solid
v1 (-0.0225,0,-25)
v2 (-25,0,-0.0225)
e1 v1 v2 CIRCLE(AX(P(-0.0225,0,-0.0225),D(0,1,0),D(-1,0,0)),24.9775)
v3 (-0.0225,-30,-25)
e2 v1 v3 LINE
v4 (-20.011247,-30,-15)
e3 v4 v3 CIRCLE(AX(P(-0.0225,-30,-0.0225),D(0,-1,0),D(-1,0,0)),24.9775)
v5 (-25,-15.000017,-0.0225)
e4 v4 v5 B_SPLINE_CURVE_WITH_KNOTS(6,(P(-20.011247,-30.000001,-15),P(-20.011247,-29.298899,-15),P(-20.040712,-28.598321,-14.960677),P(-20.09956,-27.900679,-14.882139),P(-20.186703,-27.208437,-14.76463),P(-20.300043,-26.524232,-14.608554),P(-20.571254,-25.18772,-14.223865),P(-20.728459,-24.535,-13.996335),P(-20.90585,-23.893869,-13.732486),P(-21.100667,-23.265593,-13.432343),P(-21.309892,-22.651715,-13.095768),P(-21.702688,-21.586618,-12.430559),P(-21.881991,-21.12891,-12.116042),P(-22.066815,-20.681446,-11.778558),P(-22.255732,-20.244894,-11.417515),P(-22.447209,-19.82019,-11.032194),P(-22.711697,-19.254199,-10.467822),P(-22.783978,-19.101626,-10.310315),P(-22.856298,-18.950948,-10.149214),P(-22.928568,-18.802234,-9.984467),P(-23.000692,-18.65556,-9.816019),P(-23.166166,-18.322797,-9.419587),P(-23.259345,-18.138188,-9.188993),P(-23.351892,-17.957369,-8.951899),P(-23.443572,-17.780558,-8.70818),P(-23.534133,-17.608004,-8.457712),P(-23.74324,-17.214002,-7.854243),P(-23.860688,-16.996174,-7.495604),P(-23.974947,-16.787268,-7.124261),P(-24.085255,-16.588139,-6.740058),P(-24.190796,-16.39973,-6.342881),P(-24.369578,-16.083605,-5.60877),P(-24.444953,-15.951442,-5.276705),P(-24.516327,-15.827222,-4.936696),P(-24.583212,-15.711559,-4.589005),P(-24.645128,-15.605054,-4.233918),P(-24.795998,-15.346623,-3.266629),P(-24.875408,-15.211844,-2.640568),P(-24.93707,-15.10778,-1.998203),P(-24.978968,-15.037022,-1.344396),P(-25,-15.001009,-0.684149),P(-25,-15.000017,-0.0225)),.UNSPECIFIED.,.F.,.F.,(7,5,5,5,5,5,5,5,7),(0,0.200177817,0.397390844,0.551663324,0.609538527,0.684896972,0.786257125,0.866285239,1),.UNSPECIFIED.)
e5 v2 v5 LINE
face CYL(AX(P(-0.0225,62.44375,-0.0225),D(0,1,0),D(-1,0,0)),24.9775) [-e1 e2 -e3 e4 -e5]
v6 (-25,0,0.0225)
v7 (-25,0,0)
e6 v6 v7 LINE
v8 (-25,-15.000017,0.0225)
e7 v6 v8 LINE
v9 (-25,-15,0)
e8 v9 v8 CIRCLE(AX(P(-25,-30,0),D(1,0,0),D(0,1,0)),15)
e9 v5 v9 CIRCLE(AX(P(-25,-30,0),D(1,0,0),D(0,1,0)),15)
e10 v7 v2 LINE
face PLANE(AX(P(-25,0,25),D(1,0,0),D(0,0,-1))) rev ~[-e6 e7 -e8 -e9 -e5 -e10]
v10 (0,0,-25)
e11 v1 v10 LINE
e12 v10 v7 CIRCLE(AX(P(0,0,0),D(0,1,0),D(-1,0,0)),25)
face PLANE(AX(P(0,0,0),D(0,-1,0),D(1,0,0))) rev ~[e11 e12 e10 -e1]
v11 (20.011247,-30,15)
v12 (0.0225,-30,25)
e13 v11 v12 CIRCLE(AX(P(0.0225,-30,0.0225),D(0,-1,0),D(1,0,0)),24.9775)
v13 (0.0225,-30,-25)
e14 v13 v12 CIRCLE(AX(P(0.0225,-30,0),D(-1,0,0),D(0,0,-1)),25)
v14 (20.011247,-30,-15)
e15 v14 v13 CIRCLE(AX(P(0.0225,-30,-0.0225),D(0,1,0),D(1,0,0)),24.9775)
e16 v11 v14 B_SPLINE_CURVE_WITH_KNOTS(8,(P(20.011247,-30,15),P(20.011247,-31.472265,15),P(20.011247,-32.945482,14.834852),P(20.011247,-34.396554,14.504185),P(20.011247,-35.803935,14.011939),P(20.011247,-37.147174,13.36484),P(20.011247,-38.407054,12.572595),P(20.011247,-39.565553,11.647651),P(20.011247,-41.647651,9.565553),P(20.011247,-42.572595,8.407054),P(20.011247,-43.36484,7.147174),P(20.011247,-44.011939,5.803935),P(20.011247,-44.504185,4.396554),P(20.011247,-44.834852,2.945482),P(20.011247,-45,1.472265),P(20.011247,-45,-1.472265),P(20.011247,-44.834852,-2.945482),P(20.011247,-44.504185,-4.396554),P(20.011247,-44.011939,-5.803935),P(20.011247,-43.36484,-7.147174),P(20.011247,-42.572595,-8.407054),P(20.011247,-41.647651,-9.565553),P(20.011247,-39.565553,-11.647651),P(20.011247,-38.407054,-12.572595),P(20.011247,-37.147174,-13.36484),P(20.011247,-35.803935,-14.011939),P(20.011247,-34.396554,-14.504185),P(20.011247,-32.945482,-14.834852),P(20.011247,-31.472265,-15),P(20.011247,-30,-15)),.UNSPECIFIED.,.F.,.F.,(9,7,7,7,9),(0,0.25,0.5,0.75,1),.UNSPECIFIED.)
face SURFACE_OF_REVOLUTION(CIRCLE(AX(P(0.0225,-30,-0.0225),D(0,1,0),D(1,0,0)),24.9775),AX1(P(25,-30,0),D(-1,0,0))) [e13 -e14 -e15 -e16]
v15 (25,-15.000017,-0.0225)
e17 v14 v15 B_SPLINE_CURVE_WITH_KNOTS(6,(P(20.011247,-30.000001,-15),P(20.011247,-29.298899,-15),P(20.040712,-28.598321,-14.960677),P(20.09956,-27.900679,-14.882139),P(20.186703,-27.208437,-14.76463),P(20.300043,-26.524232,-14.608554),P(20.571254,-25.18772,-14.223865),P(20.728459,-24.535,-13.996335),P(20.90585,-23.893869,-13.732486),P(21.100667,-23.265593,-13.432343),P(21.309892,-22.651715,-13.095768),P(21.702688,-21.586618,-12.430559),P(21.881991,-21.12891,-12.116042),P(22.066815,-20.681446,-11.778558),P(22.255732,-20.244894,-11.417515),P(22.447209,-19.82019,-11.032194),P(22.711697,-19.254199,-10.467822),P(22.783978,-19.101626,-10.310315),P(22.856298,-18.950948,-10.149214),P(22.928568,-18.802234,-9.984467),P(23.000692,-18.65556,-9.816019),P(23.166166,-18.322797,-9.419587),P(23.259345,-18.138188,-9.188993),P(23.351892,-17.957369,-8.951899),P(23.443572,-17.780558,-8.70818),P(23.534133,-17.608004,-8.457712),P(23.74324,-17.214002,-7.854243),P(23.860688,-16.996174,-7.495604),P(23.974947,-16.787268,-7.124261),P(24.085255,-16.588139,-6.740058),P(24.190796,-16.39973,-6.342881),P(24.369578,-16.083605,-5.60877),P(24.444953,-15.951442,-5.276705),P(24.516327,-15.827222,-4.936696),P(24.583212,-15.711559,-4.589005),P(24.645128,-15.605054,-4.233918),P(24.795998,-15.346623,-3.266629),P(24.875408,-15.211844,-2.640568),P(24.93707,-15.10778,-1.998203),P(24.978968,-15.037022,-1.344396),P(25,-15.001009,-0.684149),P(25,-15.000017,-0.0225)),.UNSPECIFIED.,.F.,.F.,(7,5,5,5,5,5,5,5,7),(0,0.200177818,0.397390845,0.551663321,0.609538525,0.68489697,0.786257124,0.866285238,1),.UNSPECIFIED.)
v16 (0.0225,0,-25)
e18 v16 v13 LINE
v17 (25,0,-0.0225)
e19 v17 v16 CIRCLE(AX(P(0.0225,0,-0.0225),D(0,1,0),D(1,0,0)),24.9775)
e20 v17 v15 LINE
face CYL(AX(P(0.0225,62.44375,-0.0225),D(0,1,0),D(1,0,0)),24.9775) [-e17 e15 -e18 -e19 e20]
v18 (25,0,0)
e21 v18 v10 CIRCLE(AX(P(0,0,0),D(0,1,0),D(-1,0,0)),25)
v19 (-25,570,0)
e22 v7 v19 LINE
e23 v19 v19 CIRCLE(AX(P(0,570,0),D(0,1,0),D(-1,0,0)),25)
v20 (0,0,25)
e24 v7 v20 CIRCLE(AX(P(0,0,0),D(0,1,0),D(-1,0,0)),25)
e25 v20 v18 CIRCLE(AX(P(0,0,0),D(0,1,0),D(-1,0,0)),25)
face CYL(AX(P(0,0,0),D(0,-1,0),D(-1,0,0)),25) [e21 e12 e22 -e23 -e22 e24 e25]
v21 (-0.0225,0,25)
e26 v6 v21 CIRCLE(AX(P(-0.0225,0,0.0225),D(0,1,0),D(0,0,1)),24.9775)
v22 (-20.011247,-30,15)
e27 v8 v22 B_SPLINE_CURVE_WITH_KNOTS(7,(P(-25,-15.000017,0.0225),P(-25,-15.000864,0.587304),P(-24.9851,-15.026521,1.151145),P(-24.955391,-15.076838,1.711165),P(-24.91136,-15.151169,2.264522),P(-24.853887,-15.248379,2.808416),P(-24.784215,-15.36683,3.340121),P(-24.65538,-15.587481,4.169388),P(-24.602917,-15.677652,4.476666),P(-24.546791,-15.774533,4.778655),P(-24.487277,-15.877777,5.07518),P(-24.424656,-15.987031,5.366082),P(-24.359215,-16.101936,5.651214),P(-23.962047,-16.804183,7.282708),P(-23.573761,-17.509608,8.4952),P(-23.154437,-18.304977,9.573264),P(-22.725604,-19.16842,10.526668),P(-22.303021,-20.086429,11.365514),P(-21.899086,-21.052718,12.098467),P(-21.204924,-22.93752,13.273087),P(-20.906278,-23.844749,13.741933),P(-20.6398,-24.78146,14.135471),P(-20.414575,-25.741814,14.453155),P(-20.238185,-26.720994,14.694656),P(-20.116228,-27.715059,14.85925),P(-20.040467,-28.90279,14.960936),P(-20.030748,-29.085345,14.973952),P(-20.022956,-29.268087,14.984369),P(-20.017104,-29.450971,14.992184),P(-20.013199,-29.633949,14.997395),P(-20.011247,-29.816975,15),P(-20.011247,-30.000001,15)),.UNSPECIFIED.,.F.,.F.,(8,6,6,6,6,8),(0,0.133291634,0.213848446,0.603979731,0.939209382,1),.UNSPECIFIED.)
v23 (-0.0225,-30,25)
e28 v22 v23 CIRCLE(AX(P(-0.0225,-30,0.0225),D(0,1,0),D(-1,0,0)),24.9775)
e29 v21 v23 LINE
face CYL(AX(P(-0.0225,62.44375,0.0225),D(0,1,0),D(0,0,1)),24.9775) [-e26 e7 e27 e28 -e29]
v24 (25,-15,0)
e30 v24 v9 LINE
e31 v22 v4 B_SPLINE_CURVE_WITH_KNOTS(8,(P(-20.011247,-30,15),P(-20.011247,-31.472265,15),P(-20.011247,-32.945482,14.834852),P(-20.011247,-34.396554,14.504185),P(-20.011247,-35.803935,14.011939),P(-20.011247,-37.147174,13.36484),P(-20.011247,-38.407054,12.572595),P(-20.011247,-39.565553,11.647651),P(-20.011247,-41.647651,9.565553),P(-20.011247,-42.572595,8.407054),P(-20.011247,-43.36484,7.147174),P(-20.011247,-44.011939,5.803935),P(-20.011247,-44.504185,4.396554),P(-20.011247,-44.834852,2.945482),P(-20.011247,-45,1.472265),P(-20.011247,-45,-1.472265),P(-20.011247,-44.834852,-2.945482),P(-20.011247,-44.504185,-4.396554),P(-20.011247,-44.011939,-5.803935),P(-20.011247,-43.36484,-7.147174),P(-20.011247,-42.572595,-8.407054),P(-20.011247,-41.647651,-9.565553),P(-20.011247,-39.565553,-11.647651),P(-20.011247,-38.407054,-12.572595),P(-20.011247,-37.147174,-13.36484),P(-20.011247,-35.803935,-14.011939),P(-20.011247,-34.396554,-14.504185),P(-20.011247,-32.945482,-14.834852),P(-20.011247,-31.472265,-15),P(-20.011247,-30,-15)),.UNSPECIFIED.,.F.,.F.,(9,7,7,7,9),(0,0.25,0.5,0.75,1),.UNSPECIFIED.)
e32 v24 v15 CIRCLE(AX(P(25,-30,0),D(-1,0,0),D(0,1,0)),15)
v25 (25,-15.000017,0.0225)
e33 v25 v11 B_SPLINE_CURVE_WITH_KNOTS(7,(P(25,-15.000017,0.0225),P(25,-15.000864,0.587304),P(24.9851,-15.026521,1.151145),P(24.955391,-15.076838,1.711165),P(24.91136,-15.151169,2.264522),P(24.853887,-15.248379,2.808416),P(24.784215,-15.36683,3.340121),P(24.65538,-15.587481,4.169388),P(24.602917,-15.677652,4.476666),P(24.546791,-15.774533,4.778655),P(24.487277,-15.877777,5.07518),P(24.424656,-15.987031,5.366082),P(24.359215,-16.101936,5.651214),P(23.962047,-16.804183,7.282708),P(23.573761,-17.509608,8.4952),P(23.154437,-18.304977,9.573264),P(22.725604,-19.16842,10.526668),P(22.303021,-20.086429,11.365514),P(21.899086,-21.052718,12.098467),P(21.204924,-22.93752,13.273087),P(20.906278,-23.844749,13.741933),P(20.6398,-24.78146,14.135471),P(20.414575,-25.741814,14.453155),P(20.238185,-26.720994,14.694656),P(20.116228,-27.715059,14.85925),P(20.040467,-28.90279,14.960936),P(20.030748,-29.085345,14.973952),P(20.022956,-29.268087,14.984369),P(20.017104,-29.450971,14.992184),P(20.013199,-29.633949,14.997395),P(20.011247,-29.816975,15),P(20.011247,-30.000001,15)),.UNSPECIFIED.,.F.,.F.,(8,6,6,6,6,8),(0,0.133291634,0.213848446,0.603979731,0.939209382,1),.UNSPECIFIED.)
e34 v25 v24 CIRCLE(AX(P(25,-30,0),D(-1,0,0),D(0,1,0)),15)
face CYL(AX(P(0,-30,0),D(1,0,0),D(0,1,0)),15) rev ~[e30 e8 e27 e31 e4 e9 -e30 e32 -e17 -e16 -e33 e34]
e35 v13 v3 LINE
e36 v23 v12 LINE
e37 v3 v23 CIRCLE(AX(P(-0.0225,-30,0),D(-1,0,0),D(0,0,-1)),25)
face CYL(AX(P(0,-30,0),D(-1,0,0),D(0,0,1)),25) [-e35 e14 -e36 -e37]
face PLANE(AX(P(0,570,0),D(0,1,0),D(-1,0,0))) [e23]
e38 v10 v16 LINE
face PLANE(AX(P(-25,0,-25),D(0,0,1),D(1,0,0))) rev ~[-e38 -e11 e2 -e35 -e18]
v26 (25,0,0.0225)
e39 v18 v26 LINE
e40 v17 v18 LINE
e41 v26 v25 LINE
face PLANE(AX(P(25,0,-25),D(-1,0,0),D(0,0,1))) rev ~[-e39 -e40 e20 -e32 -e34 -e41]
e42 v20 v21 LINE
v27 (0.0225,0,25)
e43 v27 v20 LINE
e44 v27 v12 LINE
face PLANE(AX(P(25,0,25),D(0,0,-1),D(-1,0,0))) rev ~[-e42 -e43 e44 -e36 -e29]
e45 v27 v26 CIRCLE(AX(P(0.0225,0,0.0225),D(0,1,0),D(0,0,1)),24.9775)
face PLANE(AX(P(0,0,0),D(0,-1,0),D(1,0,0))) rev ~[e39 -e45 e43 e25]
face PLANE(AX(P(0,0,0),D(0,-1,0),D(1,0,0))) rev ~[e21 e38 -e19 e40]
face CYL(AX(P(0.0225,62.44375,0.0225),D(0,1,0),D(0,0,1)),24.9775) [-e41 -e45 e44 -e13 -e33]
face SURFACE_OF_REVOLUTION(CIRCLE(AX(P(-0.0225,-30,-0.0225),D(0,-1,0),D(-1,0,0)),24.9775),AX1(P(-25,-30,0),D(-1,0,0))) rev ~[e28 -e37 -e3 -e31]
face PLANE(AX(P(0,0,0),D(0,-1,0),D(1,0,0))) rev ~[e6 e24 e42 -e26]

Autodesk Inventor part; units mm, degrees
ref_plane "XZ Plane" through (0, 0, 0) normal (0, 1, 0) x (-1, 0, 0)
ref_plane "XY Plane" through (0, 0, 0) normal (0, 0, 1) x (1, 0, 0)
sketch "Sketch1" plane through (0, 0, 0) normal (0, 1, 0) x (-1, 0, 0)
  circle A0 centre (0, 0) radius 25
  dimension "d0" = 50
extrude "Extrusion1" add sketch "Sketch1" along normal blind 570
sketch "Sketch2" plane through (0, 0, 0) normal (0, -1, 0) x (1, 0, 0)
  line L0 (-25, -25) -> (25, -25)
  line L1 (25, -25) -> (25, 25)
  line L2 (25, 25) -> (-25, 25)
  line L3 (-25, 25) -> (-25, -25)
  point P0 (0, 0)
extrude "Extrusion2" add sketch "Sketch2" along normal blind 60
sketch "Sketch3" plane through (0, 0, 0) normal (1, 0, 0) x (0, 1, 0)
  circle A0 centre (-30, 0) radius 15
  line L0 (0, -25) -> (0, 0) projected
  line L1 (0, 25) -> (-60, 25) projected
  line L2 (0, -25) -> (-60, -25) projected
  arc A1 (-30, 25) -> (-30, -25) centre (-30, 0) ccw
  line L3 (-30, 25) -> (-30, 40.1158)
  line L4 (-30, 40.1158) -> (-76.6193, 40.1158)
  line L5 (-76.6193, 40.1158) -> (-77.4473, -45.6375)
  line L6 (-77.4473, -45.6375) -> (-35.1048, -45.6375)
  line L7 (-35.1048, -45.6375) -> (-30, -25)
  dimension "d5" = 30
  dimension "d6" = 30
extrude "Extrusion3" cut sketch "Sketch3" along normal mid plane 100
fillet "Fillet1" radius 24.9775 6 edges at (25, -55, 0) (25, -15, -25) (25, -15, 25) (-25, -55, 0) (-25, -15, -25) (-25, -15, 25)
properties part number "Piston_Bom"
